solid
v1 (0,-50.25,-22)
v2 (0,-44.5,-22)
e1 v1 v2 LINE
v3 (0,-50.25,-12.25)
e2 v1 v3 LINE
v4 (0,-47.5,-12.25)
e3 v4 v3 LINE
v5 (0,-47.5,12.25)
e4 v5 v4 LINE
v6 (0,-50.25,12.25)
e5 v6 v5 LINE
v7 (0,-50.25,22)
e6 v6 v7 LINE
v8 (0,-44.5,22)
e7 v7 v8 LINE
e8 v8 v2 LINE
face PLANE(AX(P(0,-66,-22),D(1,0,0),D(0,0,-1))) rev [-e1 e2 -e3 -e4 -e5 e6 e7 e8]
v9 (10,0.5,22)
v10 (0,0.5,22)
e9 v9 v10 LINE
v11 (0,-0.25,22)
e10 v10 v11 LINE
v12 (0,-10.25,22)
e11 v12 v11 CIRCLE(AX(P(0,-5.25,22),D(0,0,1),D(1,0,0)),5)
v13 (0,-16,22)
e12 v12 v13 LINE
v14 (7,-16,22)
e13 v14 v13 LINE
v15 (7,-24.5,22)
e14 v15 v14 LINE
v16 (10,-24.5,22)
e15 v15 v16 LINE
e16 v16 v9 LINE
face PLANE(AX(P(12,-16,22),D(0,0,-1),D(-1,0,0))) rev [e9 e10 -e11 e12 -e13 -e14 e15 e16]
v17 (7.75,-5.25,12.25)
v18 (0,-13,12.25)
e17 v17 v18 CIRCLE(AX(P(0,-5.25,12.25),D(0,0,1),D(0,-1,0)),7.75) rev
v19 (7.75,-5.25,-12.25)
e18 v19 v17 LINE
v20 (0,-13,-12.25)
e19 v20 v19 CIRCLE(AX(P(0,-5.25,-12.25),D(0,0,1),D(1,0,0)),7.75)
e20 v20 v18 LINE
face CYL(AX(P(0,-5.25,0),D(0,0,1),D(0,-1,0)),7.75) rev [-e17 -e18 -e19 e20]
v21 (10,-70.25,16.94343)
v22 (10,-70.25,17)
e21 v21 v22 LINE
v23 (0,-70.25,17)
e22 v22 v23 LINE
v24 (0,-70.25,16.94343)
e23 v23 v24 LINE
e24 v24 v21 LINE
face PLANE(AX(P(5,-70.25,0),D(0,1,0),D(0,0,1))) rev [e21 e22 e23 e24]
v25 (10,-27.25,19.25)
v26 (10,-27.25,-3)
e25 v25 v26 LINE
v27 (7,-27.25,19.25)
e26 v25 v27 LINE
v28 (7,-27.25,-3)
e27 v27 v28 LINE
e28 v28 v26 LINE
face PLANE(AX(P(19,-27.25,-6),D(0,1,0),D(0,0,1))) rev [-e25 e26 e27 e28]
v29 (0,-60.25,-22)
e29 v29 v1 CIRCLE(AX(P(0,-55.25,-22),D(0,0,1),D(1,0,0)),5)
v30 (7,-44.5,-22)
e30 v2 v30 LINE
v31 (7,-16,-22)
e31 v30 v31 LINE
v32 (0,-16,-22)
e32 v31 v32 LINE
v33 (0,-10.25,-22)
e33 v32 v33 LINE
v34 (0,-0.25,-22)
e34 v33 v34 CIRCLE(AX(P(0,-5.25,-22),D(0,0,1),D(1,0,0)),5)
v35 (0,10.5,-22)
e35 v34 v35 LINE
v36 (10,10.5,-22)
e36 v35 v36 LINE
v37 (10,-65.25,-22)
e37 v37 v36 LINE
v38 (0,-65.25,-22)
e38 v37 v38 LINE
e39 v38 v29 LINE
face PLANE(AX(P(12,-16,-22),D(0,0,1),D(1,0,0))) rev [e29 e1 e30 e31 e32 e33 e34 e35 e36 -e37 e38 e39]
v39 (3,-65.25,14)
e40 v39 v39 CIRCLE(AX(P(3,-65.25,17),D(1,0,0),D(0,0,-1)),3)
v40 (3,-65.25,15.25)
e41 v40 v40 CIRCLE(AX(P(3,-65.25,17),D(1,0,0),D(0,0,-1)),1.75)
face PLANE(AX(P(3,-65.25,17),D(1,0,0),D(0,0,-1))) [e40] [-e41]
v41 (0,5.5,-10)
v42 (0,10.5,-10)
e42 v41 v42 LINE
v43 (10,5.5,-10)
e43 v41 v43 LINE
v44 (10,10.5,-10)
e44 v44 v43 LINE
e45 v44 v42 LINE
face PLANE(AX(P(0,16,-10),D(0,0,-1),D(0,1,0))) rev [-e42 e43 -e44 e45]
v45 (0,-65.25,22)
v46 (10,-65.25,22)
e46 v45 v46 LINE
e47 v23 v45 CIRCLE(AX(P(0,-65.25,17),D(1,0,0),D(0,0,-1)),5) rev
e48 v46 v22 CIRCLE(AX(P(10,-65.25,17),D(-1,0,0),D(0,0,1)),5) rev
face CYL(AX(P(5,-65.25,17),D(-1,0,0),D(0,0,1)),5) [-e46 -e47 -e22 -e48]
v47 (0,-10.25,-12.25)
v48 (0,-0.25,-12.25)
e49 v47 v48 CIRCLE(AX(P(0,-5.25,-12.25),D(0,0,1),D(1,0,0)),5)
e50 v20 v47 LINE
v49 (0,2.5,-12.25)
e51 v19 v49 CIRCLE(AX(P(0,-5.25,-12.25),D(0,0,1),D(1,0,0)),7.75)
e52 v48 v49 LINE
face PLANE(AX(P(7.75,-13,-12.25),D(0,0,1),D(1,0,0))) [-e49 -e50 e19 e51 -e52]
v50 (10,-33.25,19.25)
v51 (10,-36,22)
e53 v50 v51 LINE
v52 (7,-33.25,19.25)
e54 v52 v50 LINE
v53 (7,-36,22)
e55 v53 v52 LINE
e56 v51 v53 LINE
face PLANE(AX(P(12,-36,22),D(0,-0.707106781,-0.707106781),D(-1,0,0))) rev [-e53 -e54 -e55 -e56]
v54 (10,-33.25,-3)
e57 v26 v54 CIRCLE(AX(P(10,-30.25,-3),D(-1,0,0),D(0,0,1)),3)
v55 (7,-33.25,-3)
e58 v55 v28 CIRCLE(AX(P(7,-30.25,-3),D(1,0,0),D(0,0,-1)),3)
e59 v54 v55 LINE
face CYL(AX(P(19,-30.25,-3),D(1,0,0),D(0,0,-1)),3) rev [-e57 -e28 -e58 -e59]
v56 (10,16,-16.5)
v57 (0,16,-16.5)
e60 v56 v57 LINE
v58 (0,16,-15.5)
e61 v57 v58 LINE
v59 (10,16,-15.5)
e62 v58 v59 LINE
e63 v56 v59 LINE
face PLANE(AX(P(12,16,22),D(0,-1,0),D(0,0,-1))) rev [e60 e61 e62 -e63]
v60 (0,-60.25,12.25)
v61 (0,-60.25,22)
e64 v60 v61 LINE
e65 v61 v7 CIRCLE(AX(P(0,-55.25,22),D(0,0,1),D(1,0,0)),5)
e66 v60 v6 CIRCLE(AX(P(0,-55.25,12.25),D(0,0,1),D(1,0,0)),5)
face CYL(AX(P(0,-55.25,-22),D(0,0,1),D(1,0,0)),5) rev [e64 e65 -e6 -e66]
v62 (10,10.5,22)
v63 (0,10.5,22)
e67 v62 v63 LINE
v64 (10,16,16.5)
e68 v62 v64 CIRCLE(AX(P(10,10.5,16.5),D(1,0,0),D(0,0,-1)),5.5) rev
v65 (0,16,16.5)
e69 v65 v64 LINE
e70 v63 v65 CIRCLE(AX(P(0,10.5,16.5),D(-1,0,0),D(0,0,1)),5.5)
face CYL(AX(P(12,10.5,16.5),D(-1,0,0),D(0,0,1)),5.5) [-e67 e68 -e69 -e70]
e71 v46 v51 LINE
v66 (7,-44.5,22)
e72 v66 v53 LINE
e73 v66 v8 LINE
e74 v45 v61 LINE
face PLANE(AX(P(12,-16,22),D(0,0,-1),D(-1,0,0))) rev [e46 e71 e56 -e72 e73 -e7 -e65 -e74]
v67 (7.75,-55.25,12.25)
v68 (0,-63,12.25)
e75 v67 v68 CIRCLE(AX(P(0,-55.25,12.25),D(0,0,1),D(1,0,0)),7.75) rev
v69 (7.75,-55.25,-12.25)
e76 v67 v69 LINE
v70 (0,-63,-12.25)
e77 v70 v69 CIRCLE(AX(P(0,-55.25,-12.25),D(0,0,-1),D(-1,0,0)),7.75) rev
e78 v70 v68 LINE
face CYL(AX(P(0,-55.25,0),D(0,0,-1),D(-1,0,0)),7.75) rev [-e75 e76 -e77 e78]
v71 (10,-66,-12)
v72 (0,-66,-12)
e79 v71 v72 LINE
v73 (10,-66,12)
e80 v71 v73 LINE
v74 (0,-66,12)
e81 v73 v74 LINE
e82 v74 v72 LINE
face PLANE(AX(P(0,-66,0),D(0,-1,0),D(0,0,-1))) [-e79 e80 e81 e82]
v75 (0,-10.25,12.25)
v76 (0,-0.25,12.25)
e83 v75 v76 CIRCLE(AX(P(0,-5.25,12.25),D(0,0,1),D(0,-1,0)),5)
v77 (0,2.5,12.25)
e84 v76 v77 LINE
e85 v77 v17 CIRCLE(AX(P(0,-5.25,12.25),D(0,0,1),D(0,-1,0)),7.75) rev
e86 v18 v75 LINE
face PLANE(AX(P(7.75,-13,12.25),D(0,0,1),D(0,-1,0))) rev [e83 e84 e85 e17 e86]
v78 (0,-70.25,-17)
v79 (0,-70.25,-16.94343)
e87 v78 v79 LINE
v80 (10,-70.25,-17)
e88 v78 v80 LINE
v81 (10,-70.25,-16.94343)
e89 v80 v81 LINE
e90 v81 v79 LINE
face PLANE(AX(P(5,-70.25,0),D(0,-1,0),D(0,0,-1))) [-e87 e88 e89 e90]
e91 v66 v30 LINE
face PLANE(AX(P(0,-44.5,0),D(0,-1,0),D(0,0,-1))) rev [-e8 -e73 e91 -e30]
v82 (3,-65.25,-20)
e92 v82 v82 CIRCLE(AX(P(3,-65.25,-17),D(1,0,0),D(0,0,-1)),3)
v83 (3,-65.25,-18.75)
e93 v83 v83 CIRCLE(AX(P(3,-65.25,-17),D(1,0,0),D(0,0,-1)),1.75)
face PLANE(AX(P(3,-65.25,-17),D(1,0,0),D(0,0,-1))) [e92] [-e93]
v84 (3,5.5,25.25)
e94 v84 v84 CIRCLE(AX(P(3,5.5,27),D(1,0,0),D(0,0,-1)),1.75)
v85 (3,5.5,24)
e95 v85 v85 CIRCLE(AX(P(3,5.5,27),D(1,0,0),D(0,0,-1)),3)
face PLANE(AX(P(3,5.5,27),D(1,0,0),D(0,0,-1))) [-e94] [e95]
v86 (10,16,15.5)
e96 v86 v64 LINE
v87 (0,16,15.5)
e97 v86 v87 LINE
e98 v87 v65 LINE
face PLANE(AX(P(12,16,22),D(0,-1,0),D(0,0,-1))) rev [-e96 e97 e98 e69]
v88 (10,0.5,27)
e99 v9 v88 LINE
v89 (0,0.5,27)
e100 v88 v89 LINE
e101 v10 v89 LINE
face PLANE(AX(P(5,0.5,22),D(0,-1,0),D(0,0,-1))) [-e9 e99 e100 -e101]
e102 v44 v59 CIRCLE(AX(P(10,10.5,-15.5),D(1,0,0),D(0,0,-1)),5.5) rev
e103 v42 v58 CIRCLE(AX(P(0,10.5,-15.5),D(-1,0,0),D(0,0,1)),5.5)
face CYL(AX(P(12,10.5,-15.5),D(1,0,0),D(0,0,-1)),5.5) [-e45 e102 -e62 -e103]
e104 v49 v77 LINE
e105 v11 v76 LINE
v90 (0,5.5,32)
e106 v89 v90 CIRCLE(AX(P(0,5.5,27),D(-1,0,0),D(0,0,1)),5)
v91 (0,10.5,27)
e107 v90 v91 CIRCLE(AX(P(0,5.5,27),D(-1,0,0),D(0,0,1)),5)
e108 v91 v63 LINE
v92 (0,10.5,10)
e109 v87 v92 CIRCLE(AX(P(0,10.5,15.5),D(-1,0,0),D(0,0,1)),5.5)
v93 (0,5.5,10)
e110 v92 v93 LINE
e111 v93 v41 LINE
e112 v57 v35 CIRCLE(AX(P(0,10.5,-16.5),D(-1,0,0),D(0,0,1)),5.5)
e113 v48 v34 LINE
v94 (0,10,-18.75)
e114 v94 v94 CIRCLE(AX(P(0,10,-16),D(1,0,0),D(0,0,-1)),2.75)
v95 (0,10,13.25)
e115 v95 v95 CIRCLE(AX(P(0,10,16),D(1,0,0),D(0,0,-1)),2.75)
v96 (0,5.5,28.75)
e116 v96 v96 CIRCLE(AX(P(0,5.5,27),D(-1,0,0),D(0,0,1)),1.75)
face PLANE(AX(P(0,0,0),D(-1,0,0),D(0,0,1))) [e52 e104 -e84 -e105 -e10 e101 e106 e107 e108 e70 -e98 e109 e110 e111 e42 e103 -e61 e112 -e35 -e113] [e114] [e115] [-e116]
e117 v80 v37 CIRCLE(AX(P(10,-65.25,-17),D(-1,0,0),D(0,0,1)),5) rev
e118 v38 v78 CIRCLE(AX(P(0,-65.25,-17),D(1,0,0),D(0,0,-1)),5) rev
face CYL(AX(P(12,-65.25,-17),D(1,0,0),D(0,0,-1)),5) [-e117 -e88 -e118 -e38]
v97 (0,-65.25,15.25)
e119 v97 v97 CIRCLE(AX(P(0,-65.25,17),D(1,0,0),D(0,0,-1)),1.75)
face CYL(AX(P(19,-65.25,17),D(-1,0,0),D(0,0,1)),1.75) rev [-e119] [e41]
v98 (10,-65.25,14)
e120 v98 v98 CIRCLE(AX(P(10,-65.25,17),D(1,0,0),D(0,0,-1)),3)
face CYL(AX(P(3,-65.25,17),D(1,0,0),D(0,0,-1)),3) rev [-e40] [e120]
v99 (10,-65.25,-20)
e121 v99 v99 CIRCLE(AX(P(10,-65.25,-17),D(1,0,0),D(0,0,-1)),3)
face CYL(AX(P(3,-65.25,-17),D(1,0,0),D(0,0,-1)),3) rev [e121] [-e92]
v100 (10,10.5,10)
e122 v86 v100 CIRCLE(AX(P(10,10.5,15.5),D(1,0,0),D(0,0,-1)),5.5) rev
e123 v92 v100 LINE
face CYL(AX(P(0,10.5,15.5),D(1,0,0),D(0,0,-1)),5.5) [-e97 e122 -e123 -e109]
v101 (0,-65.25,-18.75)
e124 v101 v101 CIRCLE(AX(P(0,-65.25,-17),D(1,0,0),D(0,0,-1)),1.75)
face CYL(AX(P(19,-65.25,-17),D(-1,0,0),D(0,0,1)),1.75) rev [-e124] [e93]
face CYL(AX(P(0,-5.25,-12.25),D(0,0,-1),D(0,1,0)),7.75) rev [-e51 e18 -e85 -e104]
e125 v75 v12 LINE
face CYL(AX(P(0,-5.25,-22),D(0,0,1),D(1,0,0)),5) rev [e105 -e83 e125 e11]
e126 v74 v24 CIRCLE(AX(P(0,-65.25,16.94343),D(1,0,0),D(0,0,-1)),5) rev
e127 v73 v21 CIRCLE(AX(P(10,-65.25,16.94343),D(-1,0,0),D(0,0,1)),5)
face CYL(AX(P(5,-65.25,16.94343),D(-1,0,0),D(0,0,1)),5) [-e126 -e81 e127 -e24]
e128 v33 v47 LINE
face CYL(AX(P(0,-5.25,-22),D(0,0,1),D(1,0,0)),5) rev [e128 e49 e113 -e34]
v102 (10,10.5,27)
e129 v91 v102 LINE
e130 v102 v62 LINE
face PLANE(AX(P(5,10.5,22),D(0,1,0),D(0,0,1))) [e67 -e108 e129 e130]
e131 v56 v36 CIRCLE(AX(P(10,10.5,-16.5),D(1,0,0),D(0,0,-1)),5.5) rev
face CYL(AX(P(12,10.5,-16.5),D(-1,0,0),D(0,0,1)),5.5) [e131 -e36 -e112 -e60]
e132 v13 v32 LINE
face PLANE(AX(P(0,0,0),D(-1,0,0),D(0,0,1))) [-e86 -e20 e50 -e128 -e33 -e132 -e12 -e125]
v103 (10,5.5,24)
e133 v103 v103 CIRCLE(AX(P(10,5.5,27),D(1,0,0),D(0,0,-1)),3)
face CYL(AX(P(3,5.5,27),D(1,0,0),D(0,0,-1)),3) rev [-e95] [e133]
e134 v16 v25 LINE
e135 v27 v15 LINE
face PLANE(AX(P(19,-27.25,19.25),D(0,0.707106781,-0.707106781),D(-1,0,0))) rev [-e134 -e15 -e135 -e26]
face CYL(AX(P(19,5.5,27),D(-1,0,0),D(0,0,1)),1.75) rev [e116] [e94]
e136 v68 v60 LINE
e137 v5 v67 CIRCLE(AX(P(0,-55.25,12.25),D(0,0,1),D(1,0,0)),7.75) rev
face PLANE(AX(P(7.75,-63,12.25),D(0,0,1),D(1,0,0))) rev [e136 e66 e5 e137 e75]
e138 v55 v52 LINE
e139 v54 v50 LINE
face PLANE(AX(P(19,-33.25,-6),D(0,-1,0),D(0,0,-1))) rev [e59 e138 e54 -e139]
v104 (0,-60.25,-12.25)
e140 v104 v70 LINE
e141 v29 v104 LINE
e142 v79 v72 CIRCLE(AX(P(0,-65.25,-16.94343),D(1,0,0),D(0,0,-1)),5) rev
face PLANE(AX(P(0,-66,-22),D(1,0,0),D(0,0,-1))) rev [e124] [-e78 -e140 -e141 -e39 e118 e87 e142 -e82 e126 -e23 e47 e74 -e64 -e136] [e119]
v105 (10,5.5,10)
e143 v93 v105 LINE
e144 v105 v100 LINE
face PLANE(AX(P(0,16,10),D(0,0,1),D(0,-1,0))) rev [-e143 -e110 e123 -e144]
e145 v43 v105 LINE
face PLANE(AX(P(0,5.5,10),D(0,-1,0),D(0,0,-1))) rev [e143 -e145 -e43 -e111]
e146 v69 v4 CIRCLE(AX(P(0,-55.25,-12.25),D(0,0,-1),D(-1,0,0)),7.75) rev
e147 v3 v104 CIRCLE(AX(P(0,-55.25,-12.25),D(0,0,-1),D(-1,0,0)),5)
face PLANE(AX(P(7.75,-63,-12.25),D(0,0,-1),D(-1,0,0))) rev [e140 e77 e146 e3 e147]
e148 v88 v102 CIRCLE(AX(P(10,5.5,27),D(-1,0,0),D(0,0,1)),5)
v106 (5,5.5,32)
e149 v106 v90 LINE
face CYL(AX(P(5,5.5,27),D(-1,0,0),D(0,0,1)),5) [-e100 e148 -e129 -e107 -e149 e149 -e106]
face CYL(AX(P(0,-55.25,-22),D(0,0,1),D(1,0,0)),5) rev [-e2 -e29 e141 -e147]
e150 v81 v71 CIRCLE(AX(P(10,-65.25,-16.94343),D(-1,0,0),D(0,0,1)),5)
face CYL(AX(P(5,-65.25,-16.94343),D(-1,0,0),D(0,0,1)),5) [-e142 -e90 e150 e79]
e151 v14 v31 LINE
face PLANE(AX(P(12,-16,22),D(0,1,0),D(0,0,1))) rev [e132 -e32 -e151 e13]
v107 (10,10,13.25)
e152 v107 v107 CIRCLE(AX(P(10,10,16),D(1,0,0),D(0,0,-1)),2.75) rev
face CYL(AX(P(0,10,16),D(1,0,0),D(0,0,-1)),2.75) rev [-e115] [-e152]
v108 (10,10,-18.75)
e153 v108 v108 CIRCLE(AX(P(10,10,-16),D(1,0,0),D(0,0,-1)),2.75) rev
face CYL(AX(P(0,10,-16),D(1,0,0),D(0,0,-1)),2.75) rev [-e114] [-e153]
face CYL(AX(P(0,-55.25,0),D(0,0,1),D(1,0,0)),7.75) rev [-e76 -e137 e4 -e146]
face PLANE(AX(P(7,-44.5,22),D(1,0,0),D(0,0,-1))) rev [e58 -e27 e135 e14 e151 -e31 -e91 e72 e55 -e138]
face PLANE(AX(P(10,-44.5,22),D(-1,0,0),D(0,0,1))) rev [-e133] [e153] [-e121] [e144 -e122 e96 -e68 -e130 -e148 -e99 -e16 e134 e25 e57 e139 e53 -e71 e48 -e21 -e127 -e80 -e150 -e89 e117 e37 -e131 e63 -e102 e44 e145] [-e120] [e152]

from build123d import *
from build123d.topology import SkipClean

# Parameters (mm, degrees)
SKETCH1_W                = 44
SKETCH1_H                = 32
BOSS_EXTRUDE1_DEPTH      = 12
SKETCH2_W                = 24.5
SKETCH2_H                = 15.5
CUT_EXTRUDE1_DEPTH       = 7.75
FILLET1_R                = 7.75
CUT_EXTRUDE2_DEPTH       = 40.661851949
CUT_EXTRUDE2_DEPTH_BACK  = 40.661851949
SKETCH4_R                = 2.75
SKETCH4_W                = 20
SKETCH4_H                = 10.5
CUT_EXTRUDE3_DEPTH       = 30.732137495
SKETCH5_W                = 5.5
SKETCH5_H                = 3
BOSS_EXTRUDE4_DEPTH      = 7
CHAMFER1_SIZE            = 7
SKETCH6_W                = 11.5
SKETCH6_H                = 7
CUT_EXTRUDE5_DEPTH       = 30.732137495
FILLET4_R                = 5.5
SKETCH10_W               = 3
SKETCH10_H               = 44
BOSS_EXTRUDE6_DEPTH      = 28.5
SKETCH11_W               = 10
SKETCH11_H               = 44
BOSS_EXTRUDE7_DEPTH      = 21.5
SKETCH12_W               = 24.5
SKETCH12_H               = 15.5
CUT_EXTRUDE8_DEPTH       = 7.75
FILLET6_R                = 7.75
CUT_EXTRUDE9_DEPTH       = 82.565924258
SKETCH14_W               = 16
SKETCH14_H               = 20
BOSS_EXTRUDE8_DEPTH      = 13.5
CUT_EXTRUDE10_DEPTH      = 10
FILLET7_R                = 2
SKETCH16_R               = 1.75
CUT_EXTRUDE11_DEPTH      = 72.275872496
CUT_EXTRUDE12_START      = -3
SKETCH17_R               = 1.75
CUT_EXTRUDE12_DEPTH      = 3
SKETCH18_W               = 44
SKETCH18_H               = 3
BOSS_EXTRUDE9_DEPTH      = 10
CUT_EXTRUDE13_REACH      = 76.096
SKETCH20_W               = 11
SKETCH20_H               = 9
SKETCH21_R               = 1.75
CUT_EXTRUDE14_DEPTH      = 5
SKETCH22_R               = 1.75
CUT_EXTRUDE15_DEPTH      = 2
SKETCH23_W               = 28
SKETCH23_H               = 6
CUT_EXTRUDE16_DEPTH      = 71.867834735
FILLET8_R                = 3
CHAMFER2_SIZE            = 2.75
CHAMFER3_SIZE            = 3
FILLET9_R                = 3
SKETCH25_W               = 10
SKETCH25_H               = 10
BOSS_EXTRUDE12_DEPTH     = 5
FILLET11_R               = 5
SKETCH26_W               = 10
SKETCH26_H               = 4.25
BOSS_EXTRUDE13_DEPTH     = 5
CUT_EXTRUDE17_DEPTH      = 80.498820746
CUT_EXTRUDE17_DEPTH_BACK = 80.498820746
SKETCH27_R               = 1.75
FILLET15_R               = 5
CUT_EXTRUDE20_DEPTH      = 80.498820746
CUT_EXTRUDE20_DEPTH_BACK = 80.498820746
SKETCH29_R               = 1.75
FILLET17_R               = 5.5
BOSS_EXTRUDE14_DEPTH     = 6
CHAMFER11_SIZE           = 7
SKETCH35_R               = 3
SKETCH35_R_2             = 1.75
CUT_EXTRUDE25_DEPTH      = 79.454206388
SKETCH36_W               = 132.801714395
SKETCH36_H               = 170.132581229
CUT_EXTRUDE26_DEPTH      = 79.938662897
CUT_EXTRUDE27_OUTLINE_R  = 1.75
CUT_EXTRUDE27_DEPTH      = 13.5
SKETCH38_W               = 16
SKETCH38_H               = 28.5
BOSS_EXTRUDE16_DEPTH     = 3
SKETCH39_R               = 1.75
BOSS_EXTRUDE18_DEPTH     = 5
CUT_EXTRUDE28_START      = -7
SKETCH40_R               = 3
SKETCH40_R_2             = 1.75
CUT_EXTRUDE28_DEPTH      = 7


# Read off the part's stored shape, not the designer's step: Cut-Extrude27
# Some blends are built 0.0001 mm under size
with BuildPart() as part:
    # Sketch1 → Boss-Extrude1 (new body)
    with BuildSketch(Plane(origin=(0, 0, 0), x_dir=(0, 0, -1), z_dir=(1, 0, 0))):
        Rectangle(SKETCH1_W, SKETCH1_H)
    extrude(amount=BOSS_EXTRUDE1_DEPTH)

    # Sketch2 → Cut-Extrude1 (cut)
    with BuildSketch(Plane(origin=(0, 0, 0), x_dir=(0, 0, -1), z_dir=(1, 0, 0))):
        with Locations((0, -5.25)):
            Rectangle(SKETCH2_W, SKETCH2_H)
    extrude(amount=CUT_EXTRUDE1_DEPTH, mode=Mode.SUBTRACT)

    # Fillet1
    fillet1_edges = [part.edges().sort_by_distance(p)[0] for p in [
        (7.75, 2.5, 0),
        (7.75, -13, 0),
    ]]
    fillet(fillet1_edges, radius=FILLET1_R - 0.0001)  # a hair under: the kernel refuses the full size

    # Sketch3 → Cut-Extrude2 (cut, two sides: drawn at the far end of the back side and taken through both)
    with BuildSketch(Plane.XY.offset(-12.25).offset(-CUT_EXTRUDE2_DEPTH_BACK)):
        with BuildLine():
            ThreePointArc((0, -10.25), (3.535533906, -8.785533906), (5, -5.25))
            ThreePointArc((5, -5.25), (3.535533906, -1.714466094), (0, -0.25))
            Line((0, -0.25), (0, -10.25))
        make_face()
        with BuildLine():
            Line((0, -10.25), (0, -0.25))
            ThreePointArc((0, -0.25), (-5, -5.25), (0, -10.25))
        make_face()
    extrude(amount=CUT_EXTRUDE2_DEPTH + CUT_EXTRUDE2_DEPTH_BACK, mode=Mode.SUBTRACT)

    # Sketch4 → Cut-Extrude3 (cut, through all)
    with BuildSketch(Plane(origin=(12, 0, 0), x_dir=(0, 0, -1), z_dir=(1, 0, 0))):
        with Locations((-16, 10)):
            Circle(SKETCH4_R)
        with Locations((16, 10)):
            Circle(SKETCH4_R)
        with Locations((0, 10.75)):
            Rectangle(SKETCH4_W, SKETCH4_H)
    extrude(amount=-CUT_EXTRUDE3_DEPTH, mode=Mode.SUBTRACT)

    # Sketch5 → Boss-Extrude4 (add)
    with BuildSketch(Plane(origin=(12, 0, 0), x_dir=(0, 0, -1), z_dir=(1, 0, 0))):
        Polygon((-16, -3), (-16, 4.5), (-2.75, -3), align=None)
        Polygon((-2.75, -3), (-16, 4.5), (-2.75, 0), align=None)
        with Locations((0, -1.5)):
            Rectangle(SKETCH5_W, SKETCH5_H)
        Polygon((2.75, -3), (2.75, 0), (16, 4.5), align=None)
        Polygon((16, -3), (2.75, -3), (16, 4.5), align=None)
    extrude(amount=BOSS_EXTRUDE4_DEPTH)

    # Chamfer1
    chamfer1_edges = [part.edges().sort_by_distance(p)[0] for p in [
        (12, -3, 0),
    ]]
    chamfer(chamfer1_edges, length=CHAMFER1_SIZE - 0.0001)  # a hair under: the kernel refuses the full size

    # Sketch6 → Cut-Extrude5 (cut, through all)
    with BuildSketch(Plane(origin=(12, 0, 0), x_dir=(0, 0, -1), z_dir=(1, 0, 0))):
        with Locations((-7.25, -6.5)):
            Rectangle(SKETCH6_W, SKETCH6_H)
        with Locations((7.25, -6.5)):
            Rectangle(SKETCH6_W, SKETCH6_H)
    extrude(amount=CUT_EXTRUDE5_DEPTH, mode=Mode.SUBTRACT)

    # Fillet4
    fillet4_edges = [part.edges().sort_by_distance(p)[0] for p in [
        (6, 16, 22),
        (6, 16, -22),
    ]]
    fillet(fillet4_edges, radius=FILLET4_R)

    # Sketch10 → Boss-Extrude6 (add)
    with BuildSketch(Plane.XZ.offset(16)):
        with Locations((8.5, 0)):
            Rectangle(SKETCH10_W, SKETCH10_H)
    extrude(amount=BOSS_EXTRUDE6_DEPTH)

    # Sketch11 → Boss-Extrude7 (add)
    with BuildSketch(Plane.XZ.offset(44.5)):
        with Locations((5, 0)):
            Rectangle(SKETCH11_W, SKETCH11_H)
    extrude(amount=BOSS_EXTRUDE7_DEPTH)

    # Sketch12 → Cut-Extrude8 (cut)
    with BuildSketch(Plane.ZY):
        with Locations((0, -55.25)):
            Rectangle(SKETCH12_W, SKETCH12_H)
    extrude(amount=-CUT_EXTRUDE8_DEPTH, mode=Mode.SUBTRACT)

    # Fillet6
    fillet6_edges = [part.edges().sort_by_distance(p)[0] for p in [
        (7.75, -63, 0),
        (7.75, -47.5, 0),
    ]]
    fillet(fillet6_edges, radius=FILLET6_R - 0.0001)  # a hair under: the kernel refuses the full size

    # Sketch13 → Cut-Extrude9 (cut, through all)
    with BuildSketch(Plane.XY.offset(22)):
        with BuildLine():
            ThreePointArc((0, -60.25), (3.535533906, -58.785533906), (5, -55.25))
            ThreePointArc((5, -55.25), (3.535533906, -51.714466094), (0, -50.25))
            Line((0, -50.25), (0, -60.25))
        make_face()
        with BuildLine():
            Line((0, -60.25), (0, -50.25))
            ThreePointArc((0, -50.25), (-5, -55.25), (0, -60.25))
        make_face()
    extrude(amount=-CUT_EXTRUDE9_DEPTH, mode=Mode.SUBTRACT)

    # Sketch14 → Boss-Extrude8 (add)
    with BuildSketch(Plane.ZY.offset(-7)):
        with Locations((-14, -26)):
            Rectangle(SKETCH14_W, SKETCH14_H)
    extrude(amount=BOSS_EXTRUDE8_DEPTH)

    # Sketch15 → Cut-Extrude10 (cut)
    with BuildSketch(Plane.ZY.offset(6.5)):
        with BuildLine():
            Line((-13.727178029, -29), (-22, -29))
            Line((-22, -29), (-22, -31.5))
            Line((-22, -31.5), (-13.727178029, -31.5))
            ThreePointArc((-13.727178029, -31.5), (-14, -30.25), (-13.727178029, -29))
        make_face()
        with BuildLine():
            ThreePointArc((-8, -30.25), (-10.360286817, -27.318998969), (-13.727178029, -29))
            Line((-13.727178029, -29), (-11, -29))
            Line((-11, -29), (-11, -31.5))
            Line((-11, -31.5), (-13.727178029, -31.5))
            ThreePointArc((-13.727178029, -31.5), (-10.360286817, -33.181001031), (-8, -30.25))
        make_face()
        with BuildLine():
            Line((-11, -29), (-13.727178029, -29))
            ThreePointArc((-13.727178029, -29), (-14, -30.25), (-13.727178029, -31.5))
            Line((-13.727178029, -31.5), (-11, -31.5))
            Line((-11, -31.5), (-11, -29))
        make_face()
    extrude(amount=-CUT_EXTRUDE10_DEPTH, mode=Mode.SUBTRACT)

    # Fillet7
    fillet7_edges = [part.edges().sort_by_distance(p)[0] for p in [
        (-1.5, -31.5, -13.727178029),
        (-1.5, -29, -13.727178029),
    ]]
    fillet(fillet7_edges, radius=FILLET7_R)

    # Sketch16 → Cut-Extrude11 (cut, through all)
    with BuildSketch(Plane.ZY.offset(-3.5)):
        with Locations((-11, -30.25)):
            Circle(SKETCH16_R)
    extrude(amount=-CUT_EXTRUDE11_DEPTH, mode=Mode.SUBTRACT)

    # Sketch17 → Cut-Extrude12 (cut)
    with BuildSketch(Plane(origin=(10, 0, 0), x_dir=(0, 0, -1), z_dir=(1, 0, 0)).offset(CUT_EXTRUDE12_START)):
        Polygon((14.175426481, -30.25), (12.58771324, -27.5), (9.41228676, -27.5), (7.824573519, -30.25), (9.41228676, -33), (12.58771324, -33), align=None)
        with Locations(Location((11, -30.25, 0), (0, 0, 180))):
            Circle(SKETCH17_R, mode=Mode.SUBTRACT)
    extrude(amount=CUT_EXTRUDE12_DEPTH, mode=Mode.SUBTRACT)

    # Sketch18 → Boss-Extrude9 (add)
    with BuildSketch(Plane.ZY.offset(-7)):
        with Locations((0, -37.5)):
            Rectangle(SKETCH18_W, SKETCH18_H)
    extrude(amount=BOSS_EXTRUDE9_DEPTH)

    # Cut-Extrude13: up to this face of the body (flat: up to its plane)
    cut_extrude13_end = Plane(part.part.faces().sort_by_distance((7, -26, 8))[0])
    # Sketch20 → Cut-Extrude13 (cut, up to the picked face)
    with BuildSketch(Plane.ZY.offset(6.5), mode=Mode.PRIVATE) as cut_extrude13_sk1:
        with Locations((-16.5, -20.5)):
            Rectangle(SKETCH20_W, SKETCH20_H)
    cut_extrude13_tool1 = split(extrude(cut_extrude13_sk1.sketch, amount=-CUT_EXTRUDE13_REACH, mode=Mode.PRIVATE), bisect_by=cut_extrude13_end, keep=Keep.BOTH, mode=Mode.PRIVATE)
    add(cut_extrude13_tool1.solids().sort_by(Axis((-6.5, -20.5, -16.5), (1, 0, 0)))[0], mode=Mode.SUBTRACT)

    # Sketch21 → Cut-Extrude14 (cut)
    with BuildSketch(Plane(origin=(0, 0, -11), x_dir=(-1, 0, 0), z_dir=(0, 0, -1))):
        with Locations(Location((0, -20.5, 0), (0, 0, 90))):
            Circle(SKETCH21_R)
    extrude(amount=-CUT_EXTRUDE14_DEPTH, mode=Mode.SUBTRACT)

    # Sketch22 → Cut-Extrude15 (cut)
    with BuildSketch(Plane(origin=(0, 0, -11), x_dir=(-1, 0, 0), z_dir=(0, 0, -1))):
        Polygon((3.175426481, -20.5), (1.58771324, -17.75), (-1.58771324, -17.75), (-3.175426481, -20.5), (-1.58771324, -23.25), (1.58771324, -23.25), align=None)
        with Locations(Location((0, -20.5, 0), (0, 0, 90))):
            Circle(SKETCH22_R, mode=Mode.SUBTRACT)
    extrude(amount=-CUT_EXTRUDE15_DEPTH, mode=Mode.SUBTRACT)

    # Sketch23 → Cut-Extrude16 (cut, through all)
    with BuildSketch(Plane.ZY.offset(-7)):
        with Locations((8, -30.25)):
            Rectangle(SKETCH23_W, SKETCH23_H)
    extrude(amount=-CUT_EXTRUDE16_DEPTH, mode=Mode.SUBTRACT)

    # Fillet8
    fillet8_edges = [part.edges().sort_by_distance(p)[0] for p in [
        (8.5, -27.25, -6),
        (8.5, -33.25, -6),
    ]]
    fillet(fillet8_edges, radius=FILLET8_R - 0.0001)  # a hair under: the kernel refuses the full size

    # Chamfer2
    chamfer2_edges = [part.edges().sort_by_distance(p)[0] for p in [
        (8.5, -27.25, 22),
        (8.5, -33.25, 22),
    ]]
    chamfer(chamfer2_edges, length=CHAMFER2_SIZE)

    # Chamfer3
    # the kernel refuses this chamfer: 3 mm, written as the material it adds along each edge
    with BuildSketch(Plane(origin=(-6.5, -25, -11), x_dir=(0, -0.02749587661058678, -0.9996219169112968), z_dir=(1, 0, 0))) as chamfer3_piece_1_section:
        Polygon((CHAMFER3_SIZE * 0.999621916911, CHAMFER3_SIZE * 0.0274958766106), (-CHAMFER3_SIZE * 0.0274958766106, CHAMFER3_SIZE * 0.999621916911), (0, 0), align=None)
    chamfer3_piece_1 = extrude(amount=13.5, mode=Mode.PRIVATE)
    chamfer3_piece_1 = split(chamfer3_piece_1, bisect_by=Plane(origin=(-3.73666725, -23.25, -12.148979941), z_dir=(0, -1, 0)), keep=Keep.TOP, mode=Mode.PRIVATE)
    chamfer3_piece_1 = split(chamfer3_piece_1, bisect_by=Plane(origin=(-1.664167688, -23.117577012, -12.148979941), z_dir=(-0.8660254037844387, -0.5, 0)), keep=Keep.TOP, mode=Mode.PRIVATE)
    add(chamfer3_piece_1)
    with BuildSketch(Plane(origin=(-6.5, -25, -11), x_dir=(0, -0.02749587661058678, -0.9996219169112968), z_dir=(1, 0, 0))) as chamfer3_piece_2_section:
        Polygon((CHAMFER3_SIZE * 0.999621916911, CHAMFER3_SIZE * 0.0274958766106), (-CHAMFER3_SIZE * 0.0274958766106, CHAMFER3_SIZE * 0.999621916911), (0, 0), align=None)
    chamfer3_piece_2 = extrude(amount=13.5, mode=Mode.PRIVATE)
    chamfer3_piece_2 = split(chamfer3_piece_2, bisect_by=Plane(origin=(-4.173603854, -23.25, -11.356465756), z_dir=(0, 1, 0)), keep=Keep.TOP, mode=Mode.PRIVATE)
    chamfer3_piece_2 = split(chamfer3_piece_2, bisect_by=Plane(origin=(-2.428806744, -21.793183317, -11.356465756), z_dir=(-0.8660254037844387, -0.5, 0)), keep=Keep.TOP, mode=Mode.PRIVATE)
    add(chamfer3_piece_2)
    with BuildSketch(Plane(origin=(-6.5, -25, -11), x_dir=(0, -0.02749587661058678, -0.9996219169112968), z_dir=(1, 0, 0))) as chamfer3_piece_3_section:
        Polygon((CHAMFER3_SIZE * 0.999621916911, CHAMFER3_SIZE * 0.0274958766106), (-CHAMFER3_SIZE * 0.0274958766106, CHAMFER3_SIZE * 0.999621916911), (0, 0), align=None)
    chamfer3_piece_3 = extrude(amount=13.5, mode=Mode.PRIVATE)
    chamfer3_piece_3 = split(chamfer3_piece_3, bisect_by=Plane(origin=(0.808235084, -24.600095769, -12.048987561), z_dir=(-0.8660254037844387, 0.5, 0)), keep=Keep.TOP, mode=Mode.PRIVATE)
    chamfer3_piece_3 = split(chamfer3_piece_3, bisect_by=Plane(origin=(0, -23.25, -12.048987561), z_dir=(0, -1, 0)), keep=Keep.TOP, mode=Mode.PRIVATE)
    chamfer3_piece_3 = split(chamfer3_piece_3, bisect_by=Plane(origin=(-0.808235084, -24.600095769, -12.048987561), z_dir=(0.8660254037844387, 0.5, 0)), keep=Keep.TOP, mode=Mode.PRIVATE)
    add(chamfer3_piece_3)
    with BuildSketch(Plane(origin=(-6.5, -25, -11), x_dir=(0, -0.02749587661058678, -0.9996219169112968), z_dir=(1, 0, 0))) as chamfer3_piece_4_section:
        Polygon((CHAMFER3_SIZE * 0.999621916911, CHAMFER3_SIZE * 0.0274958766106), (-CHAMFER3_SIZE * 0.0274958766106, CHAMFER3_SIZE * 0.999621916911), (0, 0), align=None)
    chamfer3_piece_4 = extrude(amount=13.5, mode=Mode.PRIVATE)
    chamfer3_piece_4 = split(chamfer3_piece_4, bisect_by=Plane(origin=(1.727823153, -23.007322513, -12.147714097), z_dir=(0.8660254037844387, -0.5, 0)), keep=Keep.TOP, mode=Mode.PRIVATE)
    chamfer3_piece_4 = split(chamfer3_piece_4, bisect_by=Plane(origin=(3.987327516, -23.25, -12.147714097), z_dir=(0, -1, 0)), keep=Keep.TOP, mode=Mode.PRIVATE)
    add(chamfer3_piece_4)
    with BuildSketch(Plane(origin=(-6.5, -25, -11), x_dir=(0, -0.02749587661058678, -0.9996219169112968), z_dir=(1, 0, 0))) as chamfer3_piece_5_section:
        Polygon((CHAMFER3_SIZE * 0.999621916911, CHAMFER3_SIZE * 0.0274958766106), (-CHAMFER3_SIZE * 0.0274958766106, CHAMFER3_SIZE * 0.999621916911), (0, 0), align=None)
    chamfer3_piece_5 = extrude(amount=13.5, mode=Mode.PRIVATE)
    chamfer3_piece_5 = split(chamfer3_piece_5, bisect_by=Plane(origin=(2.491960026, -21.683798625, -11.355783828), z_dir=(0.8660254037844387, -0.5, 0)), keep=Keep.TOP, mode=Mode.PRIVATE)
    chamfer3_piece_5 = split(chamfer3_piece_5, bisect_by=Plane(origin=(4.423977158, -23.25, -11.355783828), z_dir=(0, 1, 0)), keep=Keep.TOP, mode=Mode.PRIVATE)
    add(chamfer3_piece_5)

    # Fillet9
    fillet9_edges = [part.edges().sort_by_distance(p)[0] for p in [
        (-6.5, -16, -8.5),
    ]]
    fillet(fillet9_edges, radius=FILLET9_R)

    # Sketch25 → Boss-Extrude12 (add)
    with BuildSketch(Plane.ZY):
        with Locations((27, 5.5)):
            Rectangle(SKETCH25_W, SKETCH25_H)
    extrude(amount=-BOSS_EXTRUDE12_DEPTH)

    # Fillet11
    fillet11_edges = [part.edges().sort_by_distance(p)[0] for p in [
        (2.5, 0.5, 32),
        (2.5, 10.5, 32),
    ]]
    fillet(fillet11_edges, radius=FILLET11_R - 0.0001)  # a hair under: the kernel refuses the full size

    # Sketch26 → Boss-Extrude13 (add)
    with BuildSketch(Plane.ZY):
        with Locations((-17, -68.125)):
            Rectangle(SKETCH26_W, SKETCH26_H)
        with Locations((17, -68.125)):
            Rectangle(SKETCH26_W, SKETCH26_H)
    extrude(amount=-BOSS_EXTRUDE13_DEPTH)

    # Sketch27 → Cut-Extrude17 (cut, two sides: drawn at the far end of the back side and taken through both)
    with BuildSketch(Plane.ZY.offset(-CUT_EXTRUDE17_DEPTH_BACK)):
        with Locations(Location((-17, -65.25, 0), (0, 0, 334.623066475))):
            Circle(SKETCH27_R)
        with Locations(Location((17, -65.25, 0), (0, 0, 334.623066475))):
            Circle(SKETCH27_R)
    extrude(amount=CUT_EXTRUDE17_DEPTH + CUT_EXTRUDE17_DEPTH_BACK, mode=Mode.SUBTRACT)

    # Fillet15
    # the kernel refuses this fillet: 5 mm, written as the material it takes off along each edge
    with BuildSketch(Plane(origin=(-12.358574958, -70.25, 12), x_dir=(0, 1, 0), z_dir=(1, 0, 0))) as fillet15_piece_1:
        with BuildLine():
            CenterArc((5, 4.943429983), FILLET15_R, 180, 81.373073441)
            Line((0, 4.943429983), (-0.1, 4.943429983))
            Line((-0.1, 4.943429983), (-0.1, 0))
            Line((-0.1, 0), (0, -0.1))
            ThreePointArc((0, -0.1), (2.125, -0.1), (4.235, -0.0988686))
            Line((4.235, -0.0988686), (4.25, 0))
        make_face()
    extrude(amount=29.717149917, mode=Mode.SUBTRACT)
    with BuildSketch(Plane(origin=(-12.358574958, -70.25, -12), x_dir=(0, 0, -1), z_dir=(1, 0, 0))) as fillet15_piece_2:
        with BuildLine():
            CenterArc((4.943429983, 5), FILLET15_R, 188.626926559, 81.373073441)
            Line((0, 4.25), (-0.0988686, 4.235))
            ThreePointArc((-0.0988686, 4.235), (-0.1, 2.125), (-0.1, 0))
            Line((-0.1, 0), (0, -0.1))
            Line((0, -0.1), (4.943429983, -0.1))
            Line((4.943429983, -0.1), (4.943429983, 0))
        make_face()
    extrude(amount=29.717149917, mode=Mode.SUBTRACT)
    with BuildSketch(Plane(origin=(-12.5, -70.25, -22), x_dir=(0, 1, 0), z_dir=(1, 0, 0))) as fillet15_piece_3:
        with BuildLine():
            CenterArc((FILLET15_R, FILLET15_R), FILLET15_R, 180, 90)
            Line((0, FILLET15_R), (-FILLET15_R * 0.02, FILLET15_R))
            Line((-FILLET15_R * 0.02, FILLET15_R), (-FILLET15_R * 0.02, -FILLET15_R * 0.02))
            Line((-FILLET15_R * 0.02, -FILLET15_R * 0.02), (FILLET15_R, -FILLET15_R * 0.02))
            Line((FILLET15_R, -FILLET15_R * 0.02), (FILLET15_R, 0))
        make_face()
    extrude(amount=30, mode=Mode.SUBTRACT)
    with BuildSketch(Plane(origin=(-12.5, -70.25, 22), x_dir=(0, 1, 0), z_dir=(1, 0, 0))) as fillet15_piece_4:
        with BuildLine():
            CenterArc((FILLET15_R, -FILLET15_R), FILLET15_R, 90, 90)
            Line((0, -FILLET15_R), (-FILLET15_R * 0.02, -FILLET15_R))
            Line((-FILLET15_R * 0.02, -FILLET15_R), (-FILLET15_R * 0.02, FILLET15_R * 0.02))
            Line((-FILLET15_R * 0.02, FILLET15_R * 0.02), (FILLET15_R, FILLET15_R * 0.02))
            Line((FILLET15_R, FILLET15_R * 0.02), (FILLET15_R, 0))
        make_face()
    extrude(amount=30, mode=Mode.SUBTRACT)

    # Sketch29 → Cut-Extrude20 (cut, two sides: drawn at the far end of the back side and taken through both)
    with BuildSketch(Plane.ZY.offset(-CUT_EXTRUDE20_DEPTH_BACK)):
        with Locations((27, 5.5)):
            Circle(SKETCH29_R)
    extrude(amount=CUT_EXTRUDE20_DEPTH + CUT_EXTRUDE20_DEPTH_BACK, mode=Mode.SUBTRACT)

    # Fillet17
    fillet17_edges = [part.edges().sort_by_distance(p)[0] for p in [
        (6, 16, 10),
        (6, 16, -10),
    ]]
    fillet(fillet17_edges, radius=FILLET17_R)

    # Sketch32 → Boss-Extrude14 (add)
    with SkipClean():  # the faces are left unmerged after this step: merging them gives an invalid solid
        with BuildSketch(Plane(origin=(0, 0, -16), x_dir=(-1, 0, 0), z_dir=(0, 0, -1))):
            Polygon((-12, -10), (-12, 4.5), (-19, 4.5), (-19, -3), align=None)
        extrude(amount=BOSS_EXTRUDE14_DEPTH)

    # Chamfer11
    chamfer11_edges = [part.edges().sort_by_distance(p)[0] for p in [
        (15.49995, -3, 13),
    ]]
    chamfer(chamfer11_edges, length=CHAMFER11_SIZE - 0.0004)  # a hair under: the kernel refuses the full size
    chamfer11_2_edges = [part.edges().sort_by_distance(p)[0] for p in [
        (15.49995, -3, -1.5),
    ]]
    chamfer(chamfer11_2_edges, length=CHAMFER11_SIZE - 0.0004)  # a hair under: the kernel refuses the full size

    # Sketch35 → Cut-Extrude25 (cut, through all)
    # profile 1 of 3: a face of its own
    with SkipClean():  # the faces are left unmerged after this step: merging them gives an invalid solid
        with BuildSketch(Plane(origin=(5, 0, 0), x_dir=(0, 0, -1), z_dir=(1, 0, 0))):
            with Locations((-27, 5.5)):
                Circle(SKETCH35_R)
            with Locations(Location((-27, 5.5, 0), (0, 0, 180))):
                Circle(SKETCH35_R_2, mode=Mode.SUBTRACT)
        # profile 2 of 3: a face of its own
        with BuildSketch(Plane(origin=(5, 0, 0), x_dir=(0, 0, -1), z_dir=(1, 0, 0))):
            with Locations((-17, -65.25)):
                Circle(SKETCH35_R)
            with Locations(Location((-17, -65.25, 0), (0, 0, 180))):
                Circle(SKETCH35_R_2, mode=Mode.SUBTRACT)
        # profile 3 of 3: a face of its own
        with BuildSketch(Plane(origin=(5, 0, 0), x_dir=(0, 0, -1), z_dir=(1, 0, 0))):
            with Locations((17, -65.25)):
                Circle(SKETCH35_R)
            with Locations(Location((17, -65.25, 0), (0, 0, 180))):
                Circle(SKETCH35_R_2, mode=Mode.SUBTRACT)
        extrude(amount=CUT_EXTRUDE25_DEPTH, mode=Mode.SUBTRACT)

    # Sketch36 → Cut-Extrude26 (cut, through all)
    with BuildSketch(Plane(origin=(10, 0, 0), x_dir=(0, 0, -1), z_dir=(1, 0, 0))):
        with Locations((-1.437867423, -36.624230017)):
            Rectangle(SKETCH36_W, SKETCH36_H)
    extrude(amount=CUT_EXTRUDE26_DEPTH, mode=Mode.SUBTRACT)

    # Cut-Extrude27 outline → Cut-Extrude27 (cut)
    with BuildSketch(Plane.ZY.offset(-7)):
        Polygon((-6, -36), (-6, -16), (-11, -16), (-11, -22), (-14, -25), (-22, -25), (-22, -39), (22, -39), (22, -36), align=None)
        with Locations((-11, -30.25)):
            Circle(CUT_EXTRUDE27_OUTLINE_R, mode=Mode.SUBTRACT)
    extrude(amount=CUT_EXTRUDE27_DEPTH, mode=Mode.SUBTRACT)

    # Sketch38 → Boss-Extrude16 (add)
    with BuildSketch(Plane.ZY.offset(-7)):
        with Locations((-14, -30.25)):
            Rectangle(SKETCH38_W, SKETCH38_H)
    extrude(amount=-BOSS_EXTRUDE16_DEPTH)

    # Sketch39 → Boss-Extrude18 (add)
    # profile 1 of 3: a face of its own
    with BuildSketch(Plane(origin=(5, 0, 0), x_dir=(0, 0, -1), z_dir=(1, 0, 0))):
        with BuildLine():
            Line((-27, 0.5), (-22, 0.5))
            Line((-22, 0.5), (-22, 10.5))
            Line((-22, 10.5), (-27, 10.5))
            ThreePointArc((-27, 10.5), (-30.535533906, 9.035533906), (-32, 5.5))
            ThreePointArc((-32, 5.5), (-30.535533906, 1.964466094), (-27, 0.5))
        make_face()
        with Locations(Location((-27, 5.5, 0), (0, 0, 180))):
            Circle(SKETCH39_R, mode=Mode.SUBTRACT)
    # profile 2 of 3: a face of its own
    with BuildSketch(Plane(origin=(5, 0, 0), x_dir=(0, 0, -1), z_dir=(1, 0, 0))):
        with BuildLine():
            Line((14.09526249, -66), (12, -66))
            ThreePointArc((12, -66), (13.683828781, -69.041437722), (16.943429983, -70.25))
            Line((16.943429983, -70.25), (17, -70.25))
            ThreePointArc((17, -70.25), (20.259601203, -69.041437722), (21.943429983, -66))
            Line((21.943429983, -66), (19.90473751, -66))
            ThreePointArc((19.90473751, -66), (17, -62.25), (14.09526249, -66))
        make_face()
        with Locations(Location((17, -65.25, 0), (0, 0, 180))):
            Circle(SKETCH39_R, mode=Mode.SUBTRACT)
    # profile 3 of 3: a face of its own
    with BuildSketch(Plane(origin=(5, 0, 0), x_dir=(0, 0, -1), z_dir=(1, 0, 0))):
        with BuildLine():
            Line((-12, -66), (-14.09526249, -66))
            ThreePointArc((-14.09526249, -66), (-17, -62.25), (-19.90473751, -66))
            Line((-19.90473751, -66), (-21.943429983, -66))
            ThreePointArc((-21.943429983, -66), (-20.259601203, -69.041437722), (-17, -70.25))
            Line((-17, -70.25), (-16.943429983, -70.25))
            ThreePointArc((-16.943429983, -70.25), (-13.683828781, -69.041437722), (-12, -66))
        make_face()
        with Locations(Location((-17, -65.25, 0), (0, 0, 180))):
            Circle(SKETCH39_R, mode=Mode.SUBTRACT)
    extrude(amount=BOSS_EXTRUDE18_DEPTH)

    # Sketch40 → Cut-Extrude28 (cut)
    # profile 1 of 3: a face of its own
    with BuildSketch(Plane(origin=(10, 0, 0), x_dir=(0, 0, -1), z_dir=(1, 0, 0)).offset(CUT_EXTRUDE28_START)):
        with Locations((-27, 5.5)):
            Circle(SKETCH40_R)
        with Locations(Location((-27, 5.5, 0), (0, 0, 180))):
            Circle(SKETCH40_R_2, mode=Mode.SUBTRACT)
    # profile 2 of 3: a face of its own
    with BuildSketch(Plane(origin=(10, 0, 0), x_dir=(0, 0, -1), z_dir=(1, 0, 0)).offset(CUT_EXTRUDE28_START)):
        with Locations((-17, -65.25)):
            Circle(SKETCH40_R)
        with Locations((-17, -65.25)):
            Circle(SKETCH40_R_2, mode=Mode.SUBTRACT)
    # profile 3 of 3: a face of its own
    with BuildSketch(Plane(origin=(10, 0, 0), x_dir=(0, 0, -1), z_dir=(1, 0, 0)).offset(CUT_EXTRUDE28_START)):
        with Locations((17, -65.25)):
            Circle(SKETCH40_R)
        with Locations((17, -65.25)):
            Circle(SKETCH40_R_2, mode=Mode.SUBTRACT)
    extrude(amount=CUT_EXTRUDE28_DEPTH, mode=Mode.SUBTRACT)


solid = part.part
